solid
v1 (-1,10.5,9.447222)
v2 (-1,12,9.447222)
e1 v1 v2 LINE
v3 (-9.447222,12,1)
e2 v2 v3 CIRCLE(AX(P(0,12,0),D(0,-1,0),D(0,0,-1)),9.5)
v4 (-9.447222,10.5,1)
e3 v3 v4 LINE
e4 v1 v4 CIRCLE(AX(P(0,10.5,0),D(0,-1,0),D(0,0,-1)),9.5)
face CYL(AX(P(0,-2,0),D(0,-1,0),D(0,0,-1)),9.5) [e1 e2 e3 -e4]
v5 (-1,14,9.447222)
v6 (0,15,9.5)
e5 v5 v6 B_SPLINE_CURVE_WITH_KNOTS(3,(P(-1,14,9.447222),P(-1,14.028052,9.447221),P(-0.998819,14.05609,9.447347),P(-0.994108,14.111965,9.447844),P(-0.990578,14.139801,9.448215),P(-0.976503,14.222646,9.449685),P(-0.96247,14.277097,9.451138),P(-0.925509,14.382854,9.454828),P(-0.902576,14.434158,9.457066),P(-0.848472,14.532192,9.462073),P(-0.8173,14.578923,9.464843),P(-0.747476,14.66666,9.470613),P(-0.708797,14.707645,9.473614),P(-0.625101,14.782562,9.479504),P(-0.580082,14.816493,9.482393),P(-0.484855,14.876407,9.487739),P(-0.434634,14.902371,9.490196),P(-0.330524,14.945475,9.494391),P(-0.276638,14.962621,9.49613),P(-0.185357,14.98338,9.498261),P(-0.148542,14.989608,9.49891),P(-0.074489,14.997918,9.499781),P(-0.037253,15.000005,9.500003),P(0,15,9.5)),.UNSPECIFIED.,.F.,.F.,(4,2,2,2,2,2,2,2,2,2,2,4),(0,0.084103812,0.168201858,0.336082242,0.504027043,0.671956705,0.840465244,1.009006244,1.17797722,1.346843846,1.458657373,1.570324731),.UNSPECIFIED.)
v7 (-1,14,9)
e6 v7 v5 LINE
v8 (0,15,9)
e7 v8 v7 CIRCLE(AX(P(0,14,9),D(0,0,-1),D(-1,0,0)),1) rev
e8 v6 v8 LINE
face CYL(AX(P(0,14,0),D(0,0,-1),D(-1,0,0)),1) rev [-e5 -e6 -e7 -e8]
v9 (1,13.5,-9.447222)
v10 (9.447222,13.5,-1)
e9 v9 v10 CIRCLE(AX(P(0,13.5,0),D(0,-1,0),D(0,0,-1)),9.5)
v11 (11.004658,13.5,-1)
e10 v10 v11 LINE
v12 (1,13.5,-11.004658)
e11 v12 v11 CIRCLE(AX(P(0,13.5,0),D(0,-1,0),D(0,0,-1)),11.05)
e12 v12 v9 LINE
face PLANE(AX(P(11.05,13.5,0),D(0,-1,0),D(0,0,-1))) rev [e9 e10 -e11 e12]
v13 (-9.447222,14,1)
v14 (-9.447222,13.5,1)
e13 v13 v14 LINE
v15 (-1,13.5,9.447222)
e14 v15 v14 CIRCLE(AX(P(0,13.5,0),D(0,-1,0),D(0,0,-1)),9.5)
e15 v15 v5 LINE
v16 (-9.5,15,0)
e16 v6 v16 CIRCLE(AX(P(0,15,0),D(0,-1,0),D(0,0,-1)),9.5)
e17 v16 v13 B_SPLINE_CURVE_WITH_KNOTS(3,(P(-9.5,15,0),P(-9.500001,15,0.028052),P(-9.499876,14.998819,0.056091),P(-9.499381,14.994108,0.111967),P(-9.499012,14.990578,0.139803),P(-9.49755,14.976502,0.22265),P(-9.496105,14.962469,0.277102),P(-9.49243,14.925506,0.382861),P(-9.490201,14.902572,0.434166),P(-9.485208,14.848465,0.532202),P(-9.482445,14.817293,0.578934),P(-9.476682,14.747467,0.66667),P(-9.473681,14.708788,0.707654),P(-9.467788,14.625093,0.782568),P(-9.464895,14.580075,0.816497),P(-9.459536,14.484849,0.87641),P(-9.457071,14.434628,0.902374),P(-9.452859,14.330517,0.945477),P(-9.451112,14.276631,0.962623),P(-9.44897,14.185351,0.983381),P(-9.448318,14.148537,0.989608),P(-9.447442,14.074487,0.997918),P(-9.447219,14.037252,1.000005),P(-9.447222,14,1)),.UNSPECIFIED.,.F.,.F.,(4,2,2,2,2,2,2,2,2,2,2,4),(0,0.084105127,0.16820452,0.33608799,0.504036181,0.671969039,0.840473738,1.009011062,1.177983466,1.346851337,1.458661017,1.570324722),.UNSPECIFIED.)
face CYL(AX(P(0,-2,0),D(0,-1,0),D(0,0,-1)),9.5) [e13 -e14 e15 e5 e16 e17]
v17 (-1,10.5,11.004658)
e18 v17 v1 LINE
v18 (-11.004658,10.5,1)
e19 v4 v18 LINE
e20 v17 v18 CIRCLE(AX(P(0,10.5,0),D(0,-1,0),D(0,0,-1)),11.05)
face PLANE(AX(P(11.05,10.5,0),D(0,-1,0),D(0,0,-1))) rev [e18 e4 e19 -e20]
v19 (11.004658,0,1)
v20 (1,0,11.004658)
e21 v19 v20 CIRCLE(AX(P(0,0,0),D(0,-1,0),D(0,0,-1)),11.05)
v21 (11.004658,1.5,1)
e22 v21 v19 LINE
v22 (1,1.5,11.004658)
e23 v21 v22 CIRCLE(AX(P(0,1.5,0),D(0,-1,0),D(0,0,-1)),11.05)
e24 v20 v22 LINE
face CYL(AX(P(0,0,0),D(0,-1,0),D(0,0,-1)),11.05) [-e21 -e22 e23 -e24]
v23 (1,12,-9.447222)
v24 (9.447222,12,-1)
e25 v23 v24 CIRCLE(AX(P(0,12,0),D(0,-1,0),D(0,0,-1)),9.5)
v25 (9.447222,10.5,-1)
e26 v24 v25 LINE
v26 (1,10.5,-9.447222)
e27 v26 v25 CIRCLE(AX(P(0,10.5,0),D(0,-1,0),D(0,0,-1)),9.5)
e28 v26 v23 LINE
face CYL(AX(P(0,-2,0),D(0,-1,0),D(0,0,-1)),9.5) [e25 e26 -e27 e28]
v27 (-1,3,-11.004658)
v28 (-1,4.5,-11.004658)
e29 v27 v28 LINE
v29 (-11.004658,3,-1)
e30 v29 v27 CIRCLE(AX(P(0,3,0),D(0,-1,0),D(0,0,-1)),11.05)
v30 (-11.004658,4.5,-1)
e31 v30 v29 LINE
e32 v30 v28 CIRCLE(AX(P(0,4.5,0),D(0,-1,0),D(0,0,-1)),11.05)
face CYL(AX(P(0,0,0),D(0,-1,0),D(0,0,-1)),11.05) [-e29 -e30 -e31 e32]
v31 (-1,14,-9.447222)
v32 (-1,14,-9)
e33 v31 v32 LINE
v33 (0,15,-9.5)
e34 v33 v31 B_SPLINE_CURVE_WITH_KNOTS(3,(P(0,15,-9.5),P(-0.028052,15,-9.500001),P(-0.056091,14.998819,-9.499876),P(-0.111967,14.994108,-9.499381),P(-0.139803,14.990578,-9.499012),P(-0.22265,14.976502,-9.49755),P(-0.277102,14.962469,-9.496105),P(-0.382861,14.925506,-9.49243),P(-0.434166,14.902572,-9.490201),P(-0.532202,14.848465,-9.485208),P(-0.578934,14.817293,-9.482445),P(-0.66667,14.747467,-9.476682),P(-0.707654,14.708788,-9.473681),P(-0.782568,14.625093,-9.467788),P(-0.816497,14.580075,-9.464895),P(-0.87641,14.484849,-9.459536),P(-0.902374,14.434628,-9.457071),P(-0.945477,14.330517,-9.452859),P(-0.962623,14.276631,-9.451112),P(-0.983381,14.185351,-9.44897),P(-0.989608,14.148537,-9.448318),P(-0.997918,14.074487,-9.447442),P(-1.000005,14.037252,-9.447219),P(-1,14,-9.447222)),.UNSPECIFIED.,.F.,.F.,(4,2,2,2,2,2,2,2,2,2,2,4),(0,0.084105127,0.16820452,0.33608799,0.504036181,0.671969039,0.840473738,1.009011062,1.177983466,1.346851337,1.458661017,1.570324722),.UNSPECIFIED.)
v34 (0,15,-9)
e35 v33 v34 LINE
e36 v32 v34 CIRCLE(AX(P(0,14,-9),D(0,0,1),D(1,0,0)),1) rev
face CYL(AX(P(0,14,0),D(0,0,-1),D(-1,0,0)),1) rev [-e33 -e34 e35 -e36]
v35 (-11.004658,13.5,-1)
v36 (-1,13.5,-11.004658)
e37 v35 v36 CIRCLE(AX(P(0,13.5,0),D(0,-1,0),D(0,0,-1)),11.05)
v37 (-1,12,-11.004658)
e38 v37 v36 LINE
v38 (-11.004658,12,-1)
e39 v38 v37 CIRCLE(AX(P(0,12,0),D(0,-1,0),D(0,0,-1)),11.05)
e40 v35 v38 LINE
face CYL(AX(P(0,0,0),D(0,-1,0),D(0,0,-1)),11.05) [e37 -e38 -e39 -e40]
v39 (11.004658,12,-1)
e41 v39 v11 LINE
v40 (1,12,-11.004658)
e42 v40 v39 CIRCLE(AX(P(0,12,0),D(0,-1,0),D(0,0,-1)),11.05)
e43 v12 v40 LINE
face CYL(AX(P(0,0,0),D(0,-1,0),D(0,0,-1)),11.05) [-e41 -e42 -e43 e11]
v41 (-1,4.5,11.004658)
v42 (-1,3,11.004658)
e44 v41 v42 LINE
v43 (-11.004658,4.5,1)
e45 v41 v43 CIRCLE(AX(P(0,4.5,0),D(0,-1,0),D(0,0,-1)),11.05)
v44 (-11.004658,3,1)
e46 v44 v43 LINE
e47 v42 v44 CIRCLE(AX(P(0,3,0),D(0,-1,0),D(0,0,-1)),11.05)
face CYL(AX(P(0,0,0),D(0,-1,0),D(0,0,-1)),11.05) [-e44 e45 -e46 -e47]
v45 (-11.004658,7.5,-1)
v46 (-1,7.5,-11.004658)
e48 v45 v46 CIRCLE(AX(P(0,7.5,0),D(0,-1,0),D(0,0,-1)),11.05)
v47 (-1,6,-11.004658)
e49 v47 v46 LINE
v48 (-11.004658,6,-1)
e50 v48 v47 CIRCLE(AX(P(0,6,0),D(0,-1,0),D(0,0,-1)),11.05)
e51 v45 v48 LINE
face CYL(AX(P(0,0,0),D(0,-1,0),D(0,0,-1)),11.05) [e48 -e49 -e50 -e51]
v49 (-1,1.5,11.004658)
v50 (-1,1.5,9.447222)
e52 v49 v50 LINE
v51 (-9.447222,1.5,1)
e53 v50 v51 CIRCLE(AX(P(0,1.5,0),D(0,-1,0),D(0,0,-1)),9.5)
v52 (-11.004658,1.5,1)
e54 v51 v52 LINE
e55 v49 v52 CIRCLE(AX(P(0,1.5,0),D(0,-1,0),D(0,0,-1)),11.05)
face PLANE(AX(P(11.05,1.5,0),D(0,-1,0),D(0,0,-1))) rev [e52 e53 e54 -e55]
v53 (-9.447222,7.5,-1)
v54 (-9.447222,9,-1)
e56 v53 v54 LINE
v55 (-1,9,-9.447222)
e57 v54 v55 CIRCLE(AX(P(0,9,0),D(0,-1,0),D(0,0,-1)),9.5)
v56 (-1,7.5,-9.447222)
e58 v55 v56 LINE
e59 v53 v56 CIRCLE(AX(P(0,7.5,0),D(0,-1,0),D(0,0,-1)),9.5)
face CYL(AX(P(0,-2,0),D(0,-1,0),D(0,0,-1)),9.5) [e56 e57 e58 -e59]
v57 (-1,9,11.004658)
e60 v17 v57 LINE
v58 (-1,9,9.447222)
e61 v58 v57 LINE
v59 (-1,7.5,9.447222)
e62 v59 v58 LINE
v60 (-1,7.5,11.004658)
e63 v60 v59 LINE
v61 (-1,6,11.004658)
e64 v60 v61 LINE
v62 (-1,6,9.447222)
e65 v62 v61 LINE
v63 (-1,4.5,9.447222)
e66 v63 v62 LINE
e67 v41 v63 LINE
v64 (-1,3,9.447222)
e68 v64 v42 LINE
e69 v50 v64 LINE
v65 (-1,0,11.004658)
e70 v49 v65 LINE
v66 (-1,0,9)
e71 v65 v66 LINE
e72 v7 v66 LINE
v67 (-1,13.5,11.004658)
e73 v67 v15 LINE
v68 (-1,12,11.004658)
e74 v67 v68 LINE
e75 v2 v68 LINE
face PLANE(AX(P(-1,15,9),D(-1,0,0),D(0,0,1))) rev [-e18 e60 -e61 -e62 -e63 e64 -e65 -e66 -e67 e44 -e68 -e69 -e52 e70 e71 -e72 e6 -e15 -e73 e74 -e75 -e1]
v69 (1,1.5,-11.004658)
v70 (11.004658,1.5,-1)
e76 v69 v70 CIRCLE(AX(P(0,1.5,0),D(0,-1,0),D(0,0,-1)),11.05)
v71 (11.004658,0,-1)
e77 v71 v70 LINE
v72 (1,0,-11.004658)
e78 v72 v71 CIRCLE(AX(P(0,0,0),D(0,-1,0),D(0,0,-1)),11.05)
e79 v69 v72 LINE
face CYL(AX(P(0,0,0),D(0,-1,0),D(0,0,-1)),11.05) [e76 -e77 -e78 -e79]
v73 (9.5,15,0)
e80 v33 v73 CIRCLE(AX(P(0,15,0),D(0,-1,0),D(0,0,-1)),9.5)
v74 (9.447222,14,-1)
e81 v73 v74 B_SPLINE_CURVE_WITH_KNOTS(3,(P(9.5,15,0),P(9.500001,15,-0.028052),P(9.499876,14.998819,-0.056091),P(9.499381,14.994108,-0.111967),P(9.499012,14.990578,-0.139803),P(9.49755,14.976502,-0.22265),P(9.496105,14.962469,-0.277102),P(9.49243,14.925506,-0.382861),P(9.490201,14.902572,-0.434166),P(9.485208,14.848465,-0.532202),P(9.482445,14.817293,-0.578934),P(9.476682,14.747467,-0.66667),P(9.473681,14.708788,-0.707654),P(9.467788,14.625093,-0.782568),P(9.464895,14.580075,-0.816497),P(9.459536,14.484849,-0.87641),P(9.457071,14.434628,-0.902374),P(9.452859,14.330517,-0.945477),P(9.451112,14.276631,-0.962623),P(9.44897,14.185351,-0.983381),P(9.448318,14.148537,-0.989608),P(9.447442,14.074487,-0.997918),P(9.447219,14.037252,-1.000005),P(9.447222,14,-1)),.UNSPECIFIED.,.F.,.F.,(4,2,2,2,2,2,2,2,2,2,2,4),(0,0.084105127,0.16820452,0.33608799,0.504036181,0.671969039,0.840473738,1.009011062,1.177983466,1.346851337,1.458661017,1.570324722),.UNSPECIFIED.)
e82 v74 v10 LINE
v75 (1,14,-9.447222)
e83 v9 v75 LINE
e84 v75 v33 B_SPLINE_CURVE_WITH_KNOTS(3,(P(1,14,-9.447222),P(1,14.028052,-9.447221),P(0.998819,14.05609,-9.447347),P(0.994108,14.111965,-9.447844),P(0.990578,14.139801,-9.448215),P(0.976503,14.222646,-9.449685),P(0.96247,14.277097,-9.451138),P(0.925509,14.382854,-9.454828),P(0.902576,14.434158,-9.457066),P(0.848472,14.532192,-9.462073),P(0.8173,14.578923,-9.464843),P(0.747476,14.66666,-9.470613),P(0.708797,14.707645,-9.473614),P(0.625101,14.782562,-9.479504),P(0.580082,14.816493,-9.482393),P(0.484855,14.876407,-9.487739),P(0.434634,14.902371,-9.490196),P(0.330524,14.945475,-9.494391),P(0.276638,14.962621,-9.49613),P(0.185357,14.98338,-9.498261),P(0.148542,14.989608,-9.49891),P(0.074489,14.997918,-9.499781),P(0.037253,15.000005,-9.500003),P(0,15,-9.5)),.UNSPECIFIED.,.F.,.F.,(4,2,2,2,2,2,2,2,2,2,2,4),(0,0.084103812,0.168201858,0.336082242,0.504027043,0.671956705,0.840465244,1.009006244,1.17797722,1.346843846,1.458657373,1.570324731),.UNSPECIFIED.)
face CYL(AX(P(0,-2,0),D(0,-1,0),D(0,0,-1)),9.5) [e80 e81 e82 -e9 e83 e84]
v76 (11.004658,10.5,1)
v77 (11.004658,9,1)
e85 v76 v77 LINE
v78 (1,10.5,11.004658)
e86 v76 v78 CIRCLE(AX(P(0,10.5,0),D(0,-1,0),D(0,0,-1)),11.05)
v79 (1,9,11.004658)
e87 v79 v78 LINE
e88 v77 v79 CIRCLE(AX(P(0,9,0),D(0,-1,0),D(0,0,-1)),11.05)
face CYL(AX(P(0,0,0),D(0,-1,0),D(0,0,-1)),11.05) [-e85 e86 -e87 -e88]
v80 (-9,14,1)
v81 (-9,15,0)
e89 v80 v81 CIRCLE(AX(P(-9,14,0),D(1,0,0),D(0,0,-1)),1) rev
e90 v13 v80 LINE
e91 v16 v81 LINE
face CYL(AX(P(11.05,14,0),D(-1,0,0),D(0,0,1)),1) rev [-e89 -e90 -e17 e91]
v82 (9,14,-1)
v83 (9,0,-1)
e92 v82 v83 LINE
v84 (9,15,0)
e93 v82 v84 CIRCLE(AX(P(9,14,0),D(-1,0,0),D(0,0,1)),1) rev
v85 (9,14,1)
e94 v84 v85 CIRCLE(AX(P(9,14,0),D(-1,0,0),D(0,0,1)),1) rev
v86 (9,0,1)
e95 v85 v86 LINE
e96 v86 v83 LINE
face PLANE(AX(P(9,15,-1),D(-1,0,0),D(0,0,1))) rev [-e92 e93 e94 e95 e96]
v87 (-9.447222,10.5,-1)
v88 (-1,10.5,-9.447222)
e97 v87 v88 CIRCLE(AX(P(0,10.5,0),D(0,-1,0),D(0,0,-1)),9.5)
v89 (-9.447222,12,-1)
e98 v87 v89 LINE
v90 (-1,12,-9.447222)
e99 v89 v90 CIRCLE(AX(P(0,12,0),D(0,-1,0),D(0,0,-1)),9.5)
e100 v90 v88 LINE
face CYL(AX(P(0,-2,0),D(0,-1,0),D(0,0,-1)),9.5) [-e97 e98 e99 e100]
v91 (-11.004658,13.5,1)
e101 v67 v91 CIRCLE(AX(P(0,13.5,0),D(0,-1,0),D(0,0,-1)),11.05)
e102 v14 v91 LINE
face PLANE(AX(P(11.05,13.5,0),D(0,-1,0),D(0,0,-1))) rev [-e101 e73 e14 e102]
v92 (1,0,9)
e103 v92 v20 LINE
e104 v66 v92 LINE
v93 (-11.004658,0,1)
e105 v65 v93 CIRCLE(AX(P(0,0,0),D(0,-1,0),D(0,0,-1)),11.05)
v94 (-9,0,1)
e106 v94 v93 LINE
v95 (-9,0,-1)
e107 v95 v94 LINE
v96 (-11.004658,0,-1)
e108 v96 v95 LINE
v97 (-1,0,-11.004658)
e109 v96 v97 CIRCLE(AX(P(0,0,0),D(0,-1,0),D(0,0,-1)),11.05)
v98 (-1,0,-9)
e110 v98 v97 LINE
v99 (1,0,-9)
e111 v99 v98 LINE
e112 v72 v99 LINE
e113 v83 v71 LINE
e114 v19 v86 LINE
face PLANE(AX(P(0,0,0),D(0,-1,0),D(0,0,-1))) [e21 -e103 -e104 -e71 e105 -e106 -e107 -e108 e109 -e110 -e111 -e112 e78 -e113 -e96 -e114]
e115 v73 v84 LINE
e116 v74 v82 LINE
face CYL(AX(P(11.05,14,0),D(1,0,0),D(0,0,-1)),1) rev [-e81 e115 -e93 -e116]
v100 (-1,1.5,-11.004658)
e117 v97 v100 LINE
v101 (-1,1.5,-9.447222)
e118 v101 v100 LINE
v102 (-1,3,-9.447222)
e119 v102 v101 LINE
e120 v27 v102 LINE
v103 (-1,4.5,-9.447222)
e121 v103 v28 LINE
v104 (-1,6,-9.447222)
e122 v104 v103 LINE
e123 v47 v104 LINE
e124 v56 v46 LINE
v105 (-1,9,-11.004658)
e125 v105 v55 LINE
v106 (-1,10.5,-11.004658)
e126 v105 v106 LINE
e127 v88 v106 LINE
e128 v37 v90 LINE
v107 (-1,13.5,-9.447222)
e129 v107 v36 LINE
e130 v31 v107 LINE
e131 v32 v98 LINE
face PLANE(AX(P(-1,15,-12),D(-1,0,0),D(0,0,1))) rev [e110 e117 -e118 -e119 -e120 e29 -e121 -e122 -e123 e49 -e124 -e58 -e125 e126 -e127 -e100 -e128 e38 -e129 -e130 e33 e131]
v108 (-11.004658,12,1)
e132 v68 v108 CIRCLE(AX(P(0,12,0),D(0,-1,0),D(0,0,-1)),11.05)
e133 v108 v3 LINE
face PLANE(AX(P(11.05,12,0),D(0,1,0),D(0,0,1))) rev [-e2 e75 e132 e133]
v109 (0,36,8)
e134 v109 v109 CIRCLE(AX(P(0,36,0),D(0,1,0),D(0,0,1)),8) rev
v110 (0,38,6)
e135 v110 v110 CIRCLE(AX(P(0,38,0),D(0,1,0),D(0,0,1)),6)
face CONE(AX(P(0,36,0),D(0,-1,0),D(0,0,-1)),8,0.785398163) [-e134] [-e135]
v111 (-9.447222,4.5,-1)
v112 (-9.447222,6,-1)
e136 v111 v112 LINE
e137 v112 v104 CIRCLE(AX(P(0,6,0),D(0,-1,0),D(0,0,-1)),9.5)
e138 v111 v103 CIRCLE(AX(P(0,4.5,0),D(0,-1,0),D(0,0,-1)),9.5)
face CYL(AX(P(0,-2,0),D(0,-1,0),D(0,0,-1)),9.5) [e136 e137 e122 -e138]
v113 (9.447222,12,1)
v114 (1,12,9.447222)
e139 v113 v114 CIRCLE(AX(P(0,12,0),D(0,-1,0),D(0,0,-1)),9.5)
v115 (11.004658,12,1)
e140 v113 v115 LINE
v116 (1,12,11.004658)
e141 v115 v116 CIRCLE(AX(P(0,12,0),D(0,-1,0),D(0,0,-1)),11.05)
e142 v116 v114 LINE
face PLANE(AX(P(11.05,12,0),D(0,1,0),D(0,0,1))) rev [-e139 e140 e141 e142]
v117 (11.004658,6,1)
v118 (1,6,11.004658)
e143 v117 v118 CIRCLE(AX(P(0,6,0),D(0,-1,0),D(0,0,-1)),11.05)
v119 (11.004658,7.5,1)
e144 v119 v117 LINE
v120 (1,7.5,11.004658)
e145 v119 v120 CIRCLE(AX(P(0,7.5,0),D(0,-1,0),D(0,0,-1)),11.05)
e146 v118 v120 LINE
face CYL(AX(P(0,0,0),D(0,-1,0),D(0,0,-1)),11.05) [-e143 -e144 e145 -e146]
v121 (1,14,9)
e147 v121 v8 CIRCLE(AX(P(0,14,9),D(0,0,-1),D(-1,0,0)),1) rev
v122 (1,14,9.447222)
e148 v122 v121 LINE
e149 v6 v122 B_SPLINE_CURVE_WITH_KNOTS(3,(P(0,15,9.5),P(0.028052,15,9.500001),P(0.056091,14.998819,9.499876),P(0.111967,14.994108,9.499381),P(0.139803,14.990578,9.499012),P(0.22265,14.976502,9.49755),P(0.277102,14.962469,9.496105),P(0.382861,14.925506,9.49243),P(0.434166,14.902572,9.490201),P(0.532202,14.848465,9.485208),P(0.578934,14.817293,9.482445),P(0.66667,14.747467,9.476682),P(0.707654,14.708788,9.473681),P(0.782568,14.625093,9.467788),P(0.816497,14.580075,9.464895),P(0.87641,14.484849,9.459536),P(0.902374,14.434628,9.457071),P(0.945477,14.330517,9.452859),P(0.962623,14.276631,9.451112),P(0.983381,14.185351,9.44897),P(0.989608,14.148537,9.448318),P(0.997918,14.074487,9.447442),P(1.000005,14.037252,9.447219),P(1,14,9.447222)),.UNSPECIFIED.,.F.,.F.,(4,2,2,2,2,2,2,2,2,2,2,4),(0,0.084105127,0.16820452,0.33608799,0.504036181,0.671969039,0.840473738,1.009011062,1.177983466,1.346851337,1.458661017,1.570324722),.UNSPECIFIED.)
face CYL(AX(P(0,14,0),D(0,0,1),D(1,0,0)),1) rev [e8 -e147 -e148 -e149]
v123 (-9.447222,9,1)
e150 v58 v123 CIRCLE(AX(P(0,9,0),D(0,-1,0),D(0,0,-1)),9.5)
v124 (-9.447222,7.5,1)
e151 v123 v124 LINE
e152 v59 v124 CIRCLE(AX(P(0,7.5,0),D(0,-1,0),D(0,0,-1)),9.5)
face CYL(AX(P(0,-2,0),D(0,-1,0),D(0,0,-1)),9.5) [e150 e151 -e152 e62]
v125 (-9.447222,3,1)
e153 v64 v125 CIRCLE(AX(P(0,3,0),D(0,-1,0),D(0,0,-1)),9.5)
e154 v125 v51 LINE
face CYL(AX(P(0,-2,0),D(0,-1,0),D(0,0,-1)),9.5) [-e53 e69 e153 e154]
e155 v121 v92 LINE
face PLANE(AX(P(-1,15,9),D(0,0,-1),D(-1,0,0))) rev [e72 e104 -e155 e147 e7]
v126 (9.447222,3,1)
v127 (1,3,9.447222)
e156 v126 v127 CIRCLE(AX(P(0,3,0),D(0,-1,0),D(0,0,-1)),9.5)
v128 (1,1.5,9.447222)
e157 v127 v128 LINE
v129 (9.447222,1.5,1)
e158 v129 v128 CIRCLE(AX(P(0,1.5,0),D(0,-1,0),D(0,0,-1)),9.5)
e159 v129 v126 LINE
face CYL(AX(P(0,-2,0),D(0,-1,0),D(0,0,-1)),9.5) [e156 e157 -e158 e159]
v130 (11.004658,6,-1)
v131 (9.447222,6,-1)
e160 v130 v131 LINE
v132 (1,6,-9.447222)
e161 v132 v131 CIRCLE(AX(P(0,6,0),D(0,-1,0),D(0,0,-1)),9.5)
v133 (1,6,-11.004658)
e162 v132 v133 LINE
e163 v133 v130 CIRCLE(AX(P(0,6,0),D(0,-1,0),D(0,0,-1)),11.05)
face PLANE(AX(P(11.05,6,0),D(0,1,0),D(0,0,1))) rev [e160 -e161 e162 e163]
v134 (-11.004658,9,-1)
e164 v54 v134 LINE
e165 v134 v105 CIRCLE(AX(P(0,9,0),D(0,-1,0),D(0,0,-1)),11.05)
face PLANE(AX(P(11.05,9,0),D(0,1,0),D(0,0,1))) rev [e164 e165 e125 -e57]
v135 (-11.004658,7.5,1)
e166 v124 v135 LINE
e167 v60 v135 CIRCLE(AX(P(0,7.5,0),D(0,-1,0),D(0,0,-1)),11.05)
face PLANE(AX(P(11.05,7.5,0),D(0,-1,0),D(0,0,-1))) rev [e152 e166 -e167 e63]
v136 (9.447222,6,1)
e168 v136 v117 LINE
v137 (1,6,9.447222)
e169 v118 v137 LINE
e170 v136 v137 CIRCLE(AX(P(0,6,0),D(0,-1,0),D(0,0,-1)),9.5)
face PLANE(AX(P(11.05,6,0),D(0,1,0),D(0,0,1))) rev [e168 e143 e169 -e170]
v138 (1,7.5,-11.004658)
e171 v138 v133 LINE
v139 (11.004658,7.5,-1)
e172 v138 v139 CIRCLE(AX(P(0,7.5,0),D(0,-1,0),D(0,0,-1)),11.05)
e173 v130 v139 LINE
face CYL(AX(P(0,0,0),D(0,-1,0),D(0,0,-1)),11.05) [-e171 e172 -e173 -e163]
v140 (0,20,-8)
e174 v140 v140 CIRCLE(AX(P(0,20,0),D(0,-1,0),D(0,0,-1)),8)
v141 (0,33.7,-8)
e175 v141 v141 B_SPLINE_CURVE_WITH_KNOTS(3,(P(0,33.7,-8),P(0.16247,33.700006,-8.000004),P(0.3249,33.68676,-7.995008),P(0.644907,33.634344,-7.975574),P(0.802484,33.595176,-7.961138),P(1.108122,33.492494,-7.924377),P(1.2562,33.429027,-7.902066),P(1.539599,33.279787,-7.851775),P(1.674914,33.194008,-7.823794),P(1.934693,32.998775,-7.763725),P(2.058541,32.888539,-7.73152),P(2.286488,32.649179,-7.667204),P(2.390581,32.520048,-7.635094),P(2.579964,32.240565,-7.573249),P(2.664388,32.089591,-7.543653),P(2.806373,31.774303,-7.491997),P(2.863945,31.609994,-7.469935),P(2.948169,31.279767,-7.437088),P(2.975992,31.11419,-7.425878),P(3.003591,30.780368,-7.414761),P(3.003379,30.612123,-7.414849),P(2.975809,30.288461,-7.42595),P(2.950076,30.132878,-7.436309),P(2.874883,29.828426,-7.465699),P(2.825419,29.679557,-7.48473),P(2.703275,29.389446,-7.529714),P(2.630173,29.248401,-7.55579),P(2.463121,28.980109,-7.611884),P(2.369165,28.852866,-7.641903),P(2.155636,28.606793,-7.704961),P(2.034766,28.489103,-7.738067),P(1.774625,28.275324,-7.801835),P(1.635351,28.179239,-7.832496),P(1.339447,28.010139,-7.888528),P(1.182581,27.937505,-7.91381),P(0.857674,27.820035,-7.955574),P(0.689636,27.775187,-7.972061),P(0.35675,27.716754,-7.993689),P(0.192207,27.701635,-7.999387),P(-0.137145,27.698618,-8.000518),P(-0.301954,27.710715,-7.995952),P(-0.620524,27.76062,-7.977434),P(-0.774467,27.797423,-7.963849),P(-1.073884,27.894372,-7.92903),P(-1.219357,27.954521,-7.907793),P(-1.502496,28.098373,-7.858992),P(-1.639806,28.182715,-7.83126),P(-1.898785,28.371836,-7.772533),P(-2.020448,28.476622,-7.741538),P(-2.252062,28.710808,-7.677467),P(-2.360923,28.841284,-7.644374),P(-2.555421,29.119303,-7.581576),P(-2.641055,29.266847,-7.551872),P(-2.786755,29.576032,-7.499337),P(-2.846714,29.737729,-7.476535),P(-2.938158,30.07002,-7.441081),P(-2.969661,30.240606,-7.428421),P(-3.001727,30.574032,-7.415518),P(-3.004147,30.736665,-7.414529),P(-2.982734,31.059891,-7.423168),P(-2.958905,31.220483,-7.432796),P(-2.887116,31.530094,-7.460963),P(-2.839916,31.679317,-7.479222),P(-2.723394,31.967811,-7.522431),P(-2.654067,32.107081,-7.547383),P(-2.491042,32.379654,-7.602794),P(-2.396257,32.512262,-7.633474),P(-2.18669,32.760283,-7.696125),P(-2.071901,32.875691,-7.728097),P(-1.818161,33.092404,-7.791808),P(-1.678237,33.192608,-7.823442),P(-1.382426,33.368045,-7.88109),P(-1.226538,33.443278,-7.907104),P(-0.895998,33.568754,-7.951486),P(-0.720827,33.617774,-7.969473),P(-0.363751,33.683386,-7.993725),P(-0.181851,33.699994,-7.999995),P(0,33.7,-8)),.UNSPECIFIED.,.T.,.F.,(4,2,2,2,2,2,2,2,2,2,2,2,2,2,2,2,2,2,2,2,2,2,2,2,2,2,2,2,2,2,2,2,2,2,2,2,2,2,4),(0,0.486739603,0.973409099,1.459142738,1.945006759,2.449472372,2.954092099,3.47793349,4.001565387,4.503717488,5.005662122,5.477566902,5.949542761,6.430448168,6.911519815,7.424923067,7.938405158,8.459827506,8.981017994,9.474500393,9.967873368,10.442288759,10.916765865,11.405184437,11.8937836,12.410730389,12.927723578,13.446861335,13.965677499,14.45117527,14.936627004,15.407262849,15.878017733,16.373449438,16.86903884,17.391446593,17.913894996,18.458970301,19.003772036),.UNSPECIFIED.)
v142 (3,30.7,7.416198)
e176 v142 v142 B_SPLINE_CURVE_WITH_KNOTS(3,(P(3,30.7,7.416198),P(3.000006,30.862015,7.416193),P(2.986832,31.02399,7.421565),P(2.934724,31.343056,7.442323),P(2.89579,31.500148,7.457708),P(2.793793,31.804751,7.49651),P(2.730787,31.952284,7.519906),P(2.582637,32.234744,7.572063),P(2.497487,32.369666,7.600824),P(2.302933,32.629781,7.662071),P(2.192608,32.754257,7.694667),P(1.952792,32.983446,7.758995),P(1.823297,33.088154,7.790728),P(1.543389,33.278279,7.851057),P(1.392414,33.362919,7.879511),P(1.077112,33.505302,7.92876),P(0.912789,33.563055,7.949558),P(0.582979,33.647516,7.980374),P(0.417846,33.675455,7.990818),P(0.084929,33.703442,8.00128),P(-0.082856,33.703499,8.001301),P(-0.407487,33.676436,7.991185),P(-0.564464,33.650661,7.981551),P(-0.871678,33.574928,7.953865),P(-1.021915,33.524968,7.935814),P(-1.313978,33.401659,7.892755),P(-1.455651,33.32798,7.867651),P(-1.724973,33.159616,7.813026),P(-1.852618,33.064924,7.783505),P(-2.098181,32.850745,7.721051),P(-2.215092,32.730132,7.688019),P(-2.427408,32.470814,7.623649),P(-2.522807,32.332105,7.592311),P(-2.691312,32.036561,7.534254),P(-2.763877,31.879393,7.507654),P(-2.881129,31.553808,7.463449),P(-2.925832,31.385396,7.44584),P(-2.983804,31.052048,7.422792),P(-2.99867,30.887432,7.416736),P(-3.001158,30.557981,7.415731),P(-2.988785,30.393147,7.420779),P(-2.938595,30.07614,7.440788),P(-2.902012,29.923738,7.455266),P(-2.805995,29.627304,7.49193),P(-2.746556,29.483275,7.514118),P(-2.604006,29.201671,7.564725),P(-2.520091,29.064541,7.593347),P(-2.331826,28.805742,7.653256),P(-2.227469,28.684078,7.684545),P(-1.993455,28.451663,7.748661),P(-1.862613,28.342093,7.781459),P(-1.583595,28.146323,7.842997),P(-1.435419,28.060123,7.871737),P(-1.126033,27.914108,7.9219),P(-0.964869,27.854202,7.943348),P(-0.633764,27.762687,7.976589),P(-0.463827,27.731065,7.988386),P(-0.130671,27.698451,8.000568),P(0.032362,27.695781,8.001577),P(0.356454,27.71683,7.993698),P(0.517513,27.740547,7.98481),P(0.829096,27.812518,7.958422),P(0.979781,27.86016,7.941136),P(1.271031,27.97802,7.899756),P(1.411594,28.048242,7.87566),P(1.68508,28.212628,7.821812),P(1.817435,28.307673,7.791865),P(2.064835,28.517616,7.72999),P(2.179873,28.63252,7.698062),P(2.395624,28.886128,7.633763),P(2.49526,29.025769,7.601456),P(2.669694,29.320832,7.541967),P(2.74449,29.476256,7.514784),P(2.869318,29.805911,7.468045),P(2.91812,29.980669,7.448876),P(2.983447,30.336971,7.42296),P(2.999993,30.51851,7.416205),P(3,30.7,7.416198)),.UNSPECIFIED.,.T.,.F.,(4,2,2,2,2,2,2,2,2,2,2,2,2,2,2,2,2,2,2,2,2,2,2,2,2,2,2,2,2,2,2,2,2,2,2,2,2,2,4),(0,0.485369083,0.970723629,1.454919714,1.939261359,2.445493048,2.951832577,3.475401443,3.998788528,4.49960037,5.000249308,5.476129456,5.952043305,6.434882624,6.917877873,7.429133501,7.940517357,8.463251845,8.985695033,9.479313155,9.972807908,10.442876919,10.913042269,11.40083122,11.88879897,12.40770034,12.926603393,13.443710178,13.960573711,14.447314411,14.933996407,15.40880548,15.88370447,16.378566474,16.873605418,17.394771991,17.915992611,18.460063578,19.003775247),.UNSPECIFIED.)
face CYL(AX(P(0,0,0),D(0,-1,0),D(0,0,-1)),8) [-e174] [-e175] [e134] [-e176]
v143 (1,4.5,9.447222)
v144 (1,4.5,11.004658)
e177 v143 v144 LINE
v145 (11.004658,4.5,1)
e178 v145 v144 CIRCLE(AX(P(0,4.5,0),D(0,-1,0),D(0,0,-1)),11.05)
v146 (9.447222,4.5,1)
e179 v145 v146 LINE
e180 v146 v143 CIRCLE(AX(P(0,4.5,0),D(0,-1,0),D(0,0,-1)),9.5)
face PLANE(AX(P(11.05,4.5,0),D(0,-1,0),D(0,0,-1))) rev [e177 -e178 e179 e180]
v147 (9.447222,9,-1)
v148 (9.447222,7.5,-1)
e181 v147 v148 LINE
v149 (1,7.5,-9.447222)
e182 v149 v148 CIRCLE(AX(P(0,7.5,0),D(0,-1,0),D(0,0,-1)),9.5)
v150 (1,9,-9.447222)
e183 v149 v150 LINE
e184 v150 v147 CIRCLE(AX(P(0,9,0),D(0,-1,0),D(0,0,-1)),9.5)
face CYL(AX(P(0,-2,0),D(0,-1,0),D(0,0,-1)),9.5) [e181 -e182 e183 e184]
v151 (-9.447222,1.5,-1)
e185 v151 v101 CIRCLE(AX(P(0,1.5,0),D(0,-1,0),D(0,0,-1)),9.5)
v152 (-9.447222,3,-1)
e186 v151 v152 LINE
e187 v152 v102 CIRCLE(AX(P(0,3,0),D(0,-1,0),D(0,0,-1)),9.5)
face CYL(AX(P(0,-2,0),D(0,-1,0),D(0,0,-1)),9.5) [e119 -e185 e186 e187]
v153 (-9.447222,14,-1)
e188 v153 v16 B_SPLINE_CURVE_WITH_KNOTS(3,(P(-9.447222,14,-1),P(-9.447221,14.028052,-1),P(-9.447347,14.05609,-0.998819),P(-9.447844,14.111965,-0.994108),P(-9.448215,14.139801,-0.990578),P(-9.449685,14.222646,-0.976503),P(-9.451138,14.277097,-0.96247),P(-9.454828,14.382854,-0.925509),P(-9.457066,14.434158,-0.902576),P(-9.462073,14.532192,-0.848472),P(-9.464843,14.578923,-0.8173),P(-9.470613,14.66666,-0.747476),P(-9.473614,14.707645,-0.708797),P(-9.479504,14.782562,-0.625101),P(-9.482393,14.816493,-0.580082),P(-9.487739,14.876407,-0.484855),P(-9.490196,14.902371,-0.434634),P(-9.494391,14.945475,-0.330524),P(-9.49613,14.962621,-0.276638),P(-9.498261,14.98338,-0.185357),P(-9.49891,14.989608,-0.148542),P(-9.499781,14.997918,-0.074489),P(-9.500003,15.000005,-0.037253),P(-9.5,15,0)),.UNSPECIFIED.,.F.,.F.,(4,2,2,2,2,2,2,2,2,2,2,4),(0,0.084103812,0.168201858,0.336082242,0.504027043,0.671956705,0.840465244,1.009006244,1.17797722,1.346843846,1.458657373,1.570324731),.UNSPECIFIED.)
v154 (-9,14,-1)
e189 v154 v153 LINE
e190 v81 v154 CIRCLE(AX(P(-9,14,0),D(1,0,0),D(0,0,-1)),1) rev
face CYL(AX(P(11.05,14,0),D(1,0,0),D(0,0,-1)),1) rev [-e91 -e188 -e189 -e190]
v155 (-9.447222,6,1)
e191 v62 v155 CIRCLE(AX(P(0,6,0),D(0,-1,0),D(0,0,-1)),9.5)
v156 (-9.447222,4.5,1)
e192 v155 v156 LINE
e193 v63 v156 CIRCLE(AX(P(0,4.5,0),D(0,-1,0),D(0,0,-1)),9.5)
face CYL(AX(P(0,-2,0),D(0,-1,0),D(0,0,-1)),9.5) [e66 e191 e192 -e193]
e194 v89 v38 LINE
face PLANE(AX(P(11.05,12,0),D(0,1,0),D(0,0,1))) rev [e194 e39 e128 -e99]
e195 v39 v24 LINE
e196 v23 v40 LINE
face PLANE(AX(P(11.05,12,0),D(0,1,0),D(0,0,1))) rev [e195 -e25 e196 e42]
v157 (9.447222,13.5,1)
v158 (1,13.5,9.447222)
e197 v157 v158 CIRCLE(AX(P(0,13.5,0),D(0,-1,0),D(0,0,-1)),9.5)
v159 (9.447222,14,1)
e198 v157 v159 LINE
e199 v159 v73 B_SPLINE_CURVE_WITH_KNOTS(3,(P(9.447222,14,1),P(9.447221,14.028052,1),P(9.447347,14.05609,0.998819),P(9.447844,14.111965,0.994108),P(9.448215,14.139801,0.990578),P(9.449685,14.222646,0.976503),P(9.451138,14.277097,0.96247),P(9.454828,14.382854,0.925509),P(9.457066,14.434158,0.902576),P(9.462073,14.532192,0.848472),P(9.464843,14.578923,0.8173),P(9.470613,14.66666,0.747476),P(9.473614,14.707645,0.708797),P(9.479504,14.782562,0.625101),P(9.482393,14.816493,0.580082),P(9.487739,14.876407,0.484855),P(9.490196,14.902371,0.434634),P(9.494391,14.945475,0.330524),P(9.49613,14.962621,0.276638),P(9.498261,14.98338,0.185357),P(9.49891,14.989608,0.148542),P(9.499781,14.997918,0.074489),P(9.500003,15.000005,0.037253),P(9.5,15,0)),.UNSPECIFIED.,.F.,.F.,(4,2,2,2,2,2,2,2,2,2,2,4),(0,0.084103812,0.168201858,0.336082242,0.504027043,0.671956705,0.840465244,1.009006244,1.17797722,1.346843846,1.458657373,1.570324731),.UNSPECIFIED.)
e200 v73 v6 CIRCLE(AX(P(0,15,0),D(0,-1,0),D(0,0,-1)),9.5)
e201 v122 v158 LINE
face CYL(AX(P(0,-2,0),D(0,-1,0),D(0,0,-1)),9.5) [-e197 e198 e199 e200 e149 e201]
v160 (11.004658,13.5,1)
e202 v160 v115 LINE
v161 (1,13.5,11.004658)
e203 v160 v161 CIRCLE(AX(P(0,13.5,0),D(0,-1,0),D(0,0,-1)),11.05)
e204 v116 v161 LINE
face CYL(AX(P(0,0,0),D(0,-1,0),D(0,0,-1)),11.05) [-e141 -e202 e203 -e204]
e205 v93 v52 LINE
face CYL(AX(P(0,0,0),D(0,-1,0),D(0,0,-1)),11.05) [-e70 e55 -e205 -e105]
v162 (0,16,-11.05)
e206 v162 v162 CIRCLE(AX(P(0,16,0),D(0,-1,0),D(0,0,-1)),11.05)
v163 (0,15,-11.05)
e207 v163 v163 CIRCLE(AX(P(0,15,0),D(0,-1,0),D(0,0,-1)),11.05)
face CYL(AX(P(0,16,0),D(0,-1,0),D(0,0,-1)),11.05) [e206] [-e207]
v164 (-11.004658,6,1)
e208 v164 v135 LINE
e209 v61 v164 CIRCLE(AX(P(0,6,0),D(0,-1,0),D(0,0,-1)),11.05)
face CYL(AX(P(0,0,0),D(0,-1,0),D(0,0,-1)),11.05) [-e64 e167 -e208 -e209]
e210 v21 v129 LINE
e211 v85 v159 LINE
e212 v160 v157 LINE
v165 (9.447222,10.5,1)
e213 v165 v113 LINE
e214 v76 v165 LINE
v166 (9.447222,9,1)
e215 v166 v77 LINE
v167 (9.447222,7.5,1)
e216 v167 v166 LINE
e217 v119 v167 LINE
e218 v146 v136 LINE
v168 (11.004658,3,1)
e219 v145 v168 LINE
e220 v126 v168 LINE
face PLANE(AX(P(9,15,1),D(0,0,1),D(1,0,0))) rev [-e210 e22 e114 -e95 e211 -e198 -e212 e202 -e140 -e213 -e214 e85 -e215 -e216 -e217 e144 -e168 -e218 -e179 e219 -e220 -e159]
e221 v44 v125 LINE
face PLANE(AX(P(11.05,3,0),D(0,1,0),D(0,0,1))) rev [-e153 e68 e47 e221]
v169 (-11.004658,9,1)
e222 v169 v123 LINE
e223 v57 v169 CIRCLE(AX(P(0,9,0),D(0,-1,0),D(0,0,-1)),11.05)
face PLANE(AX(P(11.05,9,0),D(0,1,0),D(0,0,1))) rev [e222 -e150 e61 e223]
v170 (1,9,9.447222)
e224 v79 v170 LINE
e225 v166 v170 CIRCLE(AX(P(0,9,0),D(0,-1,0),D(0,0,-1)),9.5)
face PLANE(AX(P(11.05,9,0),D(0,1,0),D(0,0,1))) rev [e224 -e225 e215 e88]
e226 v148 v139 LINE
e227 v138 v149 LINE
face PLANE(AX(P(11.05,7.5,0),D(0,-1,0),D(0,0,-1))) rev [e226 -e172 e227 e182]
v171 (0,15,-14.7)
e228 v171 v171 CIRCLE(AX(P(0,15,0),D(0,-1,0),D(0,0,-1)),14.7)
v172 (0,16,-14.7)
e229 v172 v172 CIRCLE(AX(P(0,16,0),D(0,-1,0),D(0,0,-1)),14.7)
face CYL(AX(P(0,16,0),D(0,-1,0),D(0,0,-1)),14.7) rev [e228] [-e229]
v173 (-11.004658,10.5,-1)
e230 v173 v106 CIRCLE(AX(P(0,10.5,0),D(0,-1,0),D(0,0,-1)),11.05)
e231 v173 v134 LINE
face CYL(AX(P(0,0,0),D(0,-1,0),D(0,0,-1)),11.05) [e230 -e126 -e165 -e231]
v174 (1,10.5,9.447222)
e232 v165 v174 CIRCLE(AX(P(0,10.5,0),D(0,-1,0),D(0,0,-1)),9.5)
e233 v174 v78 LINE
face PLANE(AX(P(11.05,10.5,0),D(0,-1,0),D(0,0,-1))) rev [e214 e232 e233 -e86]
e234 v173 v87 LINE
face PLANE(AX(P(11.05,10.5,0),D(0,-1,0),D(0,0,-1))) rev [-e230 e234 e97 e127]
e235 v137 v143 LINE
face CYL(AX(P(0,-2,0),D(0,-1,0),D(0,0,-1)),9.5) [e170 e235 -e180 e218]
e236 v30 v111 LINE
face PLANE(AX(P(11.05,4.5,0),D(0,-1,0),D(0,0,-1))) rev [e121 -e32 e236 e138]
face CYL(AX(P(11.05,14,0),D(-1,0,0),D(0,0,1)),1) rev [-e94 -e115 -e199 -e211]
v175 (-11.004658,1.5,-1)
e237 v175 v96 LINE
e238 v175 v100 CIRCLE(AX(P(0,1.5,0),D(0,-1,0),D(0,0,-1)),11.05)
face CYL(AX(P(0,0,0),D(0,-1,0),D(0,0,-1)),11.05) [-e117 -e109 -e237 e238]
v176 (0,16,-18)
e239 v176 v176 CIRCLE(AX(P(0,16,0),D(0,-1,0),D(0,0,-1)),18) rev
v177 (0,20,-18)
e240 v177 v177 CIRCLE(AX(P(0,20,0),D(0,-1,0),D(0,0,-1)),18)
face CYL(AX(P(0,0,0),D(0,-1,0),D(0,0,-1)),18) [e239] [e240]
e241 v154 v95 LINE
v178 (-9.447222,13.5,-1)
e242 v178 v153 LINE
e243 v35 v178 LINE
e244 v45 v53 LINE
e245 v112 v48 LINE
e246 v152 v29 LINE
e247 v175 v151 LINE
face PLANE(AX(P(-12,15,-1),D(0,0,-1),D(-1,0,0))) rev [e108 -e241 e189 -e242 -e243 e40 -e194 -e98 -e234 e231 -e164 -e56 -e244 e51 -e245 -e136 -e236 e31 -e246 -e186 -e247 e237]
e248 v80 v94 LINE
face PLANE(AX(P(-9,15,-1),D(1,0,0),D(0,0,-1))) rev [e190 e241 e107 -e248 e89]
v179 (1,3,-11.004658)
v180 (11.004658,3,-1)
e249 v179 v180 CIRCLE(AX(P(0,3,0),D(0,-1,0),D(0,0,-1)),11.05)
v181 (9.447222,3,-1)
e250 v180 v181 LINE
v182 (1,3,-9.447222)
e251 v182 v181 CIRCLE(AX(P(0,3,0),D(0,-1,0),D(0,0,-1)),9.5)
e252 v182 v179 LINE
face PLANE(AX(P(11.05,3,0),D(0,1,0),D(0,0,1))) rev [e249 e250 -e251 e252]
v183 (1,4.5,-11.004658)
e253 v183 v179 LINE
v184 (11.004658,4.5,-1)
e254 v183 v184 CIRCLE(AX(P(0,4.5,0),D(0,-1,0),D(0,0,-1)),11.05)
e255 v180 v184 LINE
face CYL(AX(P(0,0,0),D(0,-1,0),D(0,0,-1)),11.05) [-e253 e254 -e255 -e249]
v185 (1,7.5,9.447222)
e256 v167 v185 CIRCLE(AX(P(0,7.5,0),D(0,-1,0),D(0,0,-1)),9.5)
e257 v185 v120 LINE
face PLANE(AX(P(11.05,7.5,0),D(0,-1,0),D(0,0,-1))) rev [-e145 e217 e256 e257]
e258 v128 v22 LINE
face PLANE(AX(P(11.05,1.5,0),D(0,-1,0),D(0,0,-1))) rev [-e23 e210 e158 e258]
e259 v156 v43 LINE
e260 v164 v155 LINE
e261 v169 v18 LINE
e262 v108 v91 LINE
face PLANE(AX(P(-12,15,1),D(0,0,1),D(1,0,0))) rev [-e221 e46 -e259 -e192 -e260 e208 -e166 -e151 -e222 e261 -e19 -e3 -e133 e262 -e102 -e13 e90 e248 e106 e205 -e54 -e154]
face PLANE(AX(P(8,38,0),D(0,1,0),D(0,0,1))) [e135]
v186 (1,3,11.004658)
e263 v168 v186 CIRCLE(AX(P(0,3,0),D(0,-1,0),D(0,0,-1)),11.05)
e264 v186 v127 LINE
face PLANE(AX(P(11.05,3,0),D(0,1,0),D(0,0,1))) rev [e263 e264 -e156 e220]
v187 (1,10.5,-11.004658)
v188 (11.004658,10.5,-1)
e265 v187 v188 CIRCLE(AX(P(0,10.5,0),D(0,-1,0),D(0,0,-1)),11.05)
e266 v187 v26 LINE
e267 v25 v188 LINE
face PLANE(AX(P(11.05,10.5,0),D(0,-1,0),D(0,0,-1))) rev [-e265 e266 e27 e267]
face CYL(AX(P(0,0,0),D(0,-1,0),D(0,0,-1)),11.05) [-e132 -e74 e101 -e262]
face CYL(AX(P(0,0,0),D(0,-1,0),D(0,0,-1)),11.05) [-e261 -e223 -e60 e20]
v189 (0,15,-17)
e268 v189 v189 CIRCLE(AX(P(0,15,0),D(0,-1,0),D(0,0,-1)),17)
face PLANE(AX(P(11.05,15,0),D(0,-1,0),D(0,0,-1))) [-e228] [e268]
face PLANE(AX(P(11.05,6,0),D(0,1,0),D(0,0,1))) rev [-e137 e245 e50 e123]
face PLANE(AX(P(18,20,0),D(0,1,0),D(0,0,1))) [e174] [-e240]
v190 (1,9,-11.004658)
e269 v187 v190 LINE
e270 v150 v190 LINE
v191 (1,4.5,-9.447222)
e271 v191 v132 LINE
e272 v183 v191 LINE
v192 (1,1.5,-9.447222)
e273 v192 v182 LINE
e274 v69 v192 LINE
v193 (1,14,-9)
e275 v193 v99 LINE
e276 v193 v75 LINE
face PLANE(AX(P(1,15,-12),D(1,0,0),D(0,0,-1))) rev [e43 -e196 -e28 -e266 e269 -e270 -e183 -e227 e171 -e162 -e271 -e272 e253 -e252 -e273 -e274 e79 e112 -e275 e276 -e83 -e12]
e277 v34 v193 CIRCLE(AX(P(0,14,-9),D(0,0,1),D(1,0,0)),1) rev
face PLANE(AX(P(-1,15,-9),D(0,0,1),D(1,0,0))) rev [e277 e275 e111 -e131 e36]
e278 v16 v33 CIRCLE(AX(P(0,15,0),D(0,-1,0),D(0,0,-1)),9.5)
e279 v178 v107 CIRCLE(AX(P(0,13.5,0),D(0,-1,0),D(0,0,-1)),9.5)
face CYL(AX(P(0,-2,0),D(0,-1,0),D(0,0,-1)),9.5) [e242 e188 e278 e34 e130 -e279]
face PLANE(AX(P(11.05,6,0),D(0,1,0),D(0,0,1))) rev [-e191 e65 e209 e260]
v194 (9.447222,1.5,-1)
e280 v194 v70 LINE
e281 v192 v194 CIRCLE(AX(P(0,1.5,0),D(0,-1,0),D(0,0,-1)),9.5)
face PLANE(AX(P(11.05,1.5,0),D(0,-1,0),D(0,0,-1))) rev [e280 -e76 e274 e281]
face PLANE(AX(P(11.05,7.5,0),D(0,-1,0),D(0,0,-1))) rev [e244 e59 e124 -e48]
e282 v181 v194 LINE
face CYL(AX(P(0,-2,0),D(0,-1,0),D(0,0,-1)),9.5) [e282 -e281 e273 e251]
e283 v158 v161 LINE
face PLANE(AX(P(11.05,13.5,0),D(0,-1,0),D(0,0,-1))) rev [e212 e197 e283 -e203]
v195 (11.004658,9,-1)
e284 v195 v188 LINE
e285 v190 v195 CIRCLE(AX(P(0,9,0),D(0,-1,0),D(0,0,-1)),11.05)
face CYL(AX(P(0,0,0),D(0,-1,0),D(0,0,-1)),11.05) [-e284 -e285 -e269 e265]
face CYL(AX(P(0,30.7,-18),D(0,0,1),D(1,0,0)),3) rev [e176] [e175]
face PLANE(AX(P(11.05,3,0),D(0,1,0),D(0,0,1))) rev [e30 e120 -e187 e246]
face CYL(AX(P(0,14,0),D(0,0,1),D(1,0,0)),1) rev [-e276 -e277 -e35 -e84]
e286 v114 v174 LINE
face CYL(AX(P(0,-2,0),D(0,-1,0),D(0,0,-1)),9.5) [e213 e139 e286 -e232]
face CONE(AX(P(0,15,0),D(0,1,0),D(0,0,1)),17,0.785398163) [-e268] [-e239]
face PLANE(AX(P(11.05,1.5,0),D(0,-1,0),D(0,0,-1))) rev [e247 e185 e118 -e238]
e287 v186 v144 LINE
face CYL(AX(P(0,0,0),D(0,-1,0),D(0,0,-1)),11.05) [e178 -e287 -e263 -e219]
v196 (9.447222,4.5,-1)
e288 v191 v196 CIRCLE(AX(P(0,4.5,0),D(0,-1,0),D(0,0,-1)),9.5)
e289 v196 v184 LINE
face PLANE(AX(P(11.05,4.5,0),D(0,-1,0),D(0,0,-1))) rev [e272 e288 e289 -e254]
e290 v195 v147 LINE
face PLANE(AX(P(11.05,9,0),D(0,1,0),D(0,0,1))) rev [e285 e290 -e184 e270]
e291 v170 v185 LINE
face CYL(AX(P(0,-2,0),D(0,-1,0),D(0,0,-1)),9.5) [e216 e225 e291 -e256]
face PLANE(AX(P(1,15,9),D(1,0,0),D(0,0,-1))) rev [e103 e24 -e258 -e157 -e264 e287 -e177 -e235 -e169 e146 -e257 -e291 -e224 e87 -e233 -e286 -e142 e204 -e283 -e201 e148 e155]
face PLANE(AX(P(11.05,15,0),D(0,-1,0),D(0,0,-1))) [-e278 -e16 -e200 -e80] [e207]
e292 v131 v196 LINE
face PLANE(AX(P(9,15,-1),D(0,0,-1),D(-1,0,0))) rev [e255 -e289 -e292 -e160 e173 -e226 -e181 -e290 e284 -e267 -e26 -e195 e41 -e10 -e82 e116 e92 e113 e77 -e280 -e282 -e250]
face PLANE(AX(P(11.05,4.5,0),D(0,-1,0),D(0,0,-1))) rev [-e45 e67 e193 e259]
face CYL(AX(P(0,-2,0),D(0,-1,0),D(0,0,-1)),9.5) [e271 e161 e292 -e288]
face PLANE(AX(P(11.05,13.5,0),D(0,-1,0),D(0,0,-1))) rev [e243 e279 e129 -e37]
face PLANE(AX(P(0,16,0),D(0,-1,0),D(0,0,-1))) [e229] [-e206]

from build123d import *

# Parameters (mm, degrees)
CUT_EXTRUDE1_DEPTH      = 46.738386504
CUT_EXTRUDE1_DEPTH_BACK = 46.738386504
SKETCH2_R               = 3
CHAMFER1_SIZE           = 1
SKETCH3_W               = 1.55
SKETCH3_H               = 1.5
CUT_EXTRUDE3_START      = -1
SKETCH4_R               = 14.7
SKETCH4_R_2             = 11.05
CUT_EXTRUDE3_DEPTH      = 1
SKETCH5_W               = 2
SKETCH5_H               = 3
SKETCH5_W_2             = 3
SKETCH5_H_2             = 2
CUT_EXTRUDE4_DEPTH      = 15
FILLET1_R               = 1
CHAMFER2_SIZE           = 2


with BuildPart() as part:
    # Sketch1 → Revolve1 (revolve)
    with BuildSketch(Plane.XY, mode=Mode.PRIVATE) as revolve1_sk:
        Polygon((0, 0), (11.05, 0), (11.05, 15), (18, 15), (18, 20), (8, 20), (8, 38), (0, 38), align=None)
    revolve(revolve1_sk.sketch.rotate(Axis((0, 0, 0), (0, 1, 0)), 90), axis=Axis((0, 0, 0), (0, 1, 0)))

    # Sketch2 → Cut-Extrude1 (cut, two sides: drawn at the far end of the back side and taken through both)
    with BuildSketch(Plane.XY.offset(-CUT_EXTRUDE1_DEPTH_BACK)):
        with Locations((0, 30.7)):
            Circle(SKETCH2_R)
    extrude(amount=CUT_EXTRUDE1_DEPTH + CUT_EXTRUDE1_DEPTH_BACK, mode=Mode.SUBTRACT)

    # Chamfer1
    chamfer1_edges = [part.edges().sort_by_distance(p)[0] for p in [
        (0, 15, 18),
    ]]
    chamfer(chamfer1_edges, length=CHAMFER1_SIZE)

    # Sketch3 → Cut-Revolve1 (revolve, cut)
    with BuildSketch(Plane.XY, mode=Mode.PRIVATE) as cut_revolve1_sk:
        with Locations((10.275, 2.25)):
            Rectangle(SKETCH3_W, SKETCH3_H)
        with Locations((10.275, 5.25)):
            Rectangle(SKETCH3_W, SKETCH3_H)
        with Locations((10.275, 8.25)):
            Rectangle(SKETCH3_W, SKETCH3_H)
        with Locations((10.275, 11.25)):
            Rectangle(SKETCH3_W, SKETCH3_H)
        with Locations((10.275, 14.25)):
            Rectangle(SKETCH3_W, SKETCH3_H)
    revolve(cut_revolve1_sk.sketch.rotate(Axis((0, -2, 0), (0, 1, 0)), 90), axis=Axis((0, -2, 0), (0, 1, 0)), mode=Mode.SUBTRACT)

    # Sketch4 → Cut-Extrude3 (cut)
    with BuildSketch(Plane.XZ.offset(-15).offset(CUT_EXTRUDE3_START)):
        with Locations(Location((0, 0, 0), (0, 0, 270))):
            Circle(SKETCH4_R)
        with Locations(Location((0, 0, 0), (0, 0, 270))):
            Circle(SKETCH4_R_2, mode=Mode.SUBTRACT)
    extrude(amount=CUT_EXTRUDE3_DEPTH, mode=Mode.SUBTRACT)

    # Sketch5 → Cut-Extrude4 (cut)
    with BuildSketch(Plane.XZ):
        with Locations((0, -10.5)):
            Rectangle(SKETCH5_W, SKETCH5_H)
        with Locations((0, 10.5)):
            Rectangle(SKETCH5_W, SKETCH5_H)
        with Locations((-10.5, 0)):
            Rectangle(SKETCH5_W_2, SKETCH5_H_2)
        with Locations((10.5, 0)):
            Rectangle(SKETCH5_W_2, SKETCH5_H_2)
    extrude(amount=-CUT_EXTRUDE4_DEPTH, mode=Mode.SUBTRACT)

    # Fillet1
    fillet1_edges = [part.edges().sort_by_distance(p)[0] for p in [
        (9.223610907, 15, -1),
        (9.223610907, 15, 1),
        (-1, 15, -9.223610907),
        (1, 15, -9.223610907),
        (-9.223610907, 15, 1),
        (-9.223610907, 15, -1),
        (1, 15, 9.223610907),
        (-1, 15, 9.223610907),
    ]]
    fillet(fillet1_edges, radius=FILLET1_R - 0.0001)  # a hair under: the kernel refuses the full size

    # Chamfer2
    chamfer2_edges = [part.edges().sort_by_distance(p)[0] for p in [
        (0, 38, 8),
    ]]
    chamfer(chamfer2_edges, length=CHAMFER2_SIZE)


solid = part.part
